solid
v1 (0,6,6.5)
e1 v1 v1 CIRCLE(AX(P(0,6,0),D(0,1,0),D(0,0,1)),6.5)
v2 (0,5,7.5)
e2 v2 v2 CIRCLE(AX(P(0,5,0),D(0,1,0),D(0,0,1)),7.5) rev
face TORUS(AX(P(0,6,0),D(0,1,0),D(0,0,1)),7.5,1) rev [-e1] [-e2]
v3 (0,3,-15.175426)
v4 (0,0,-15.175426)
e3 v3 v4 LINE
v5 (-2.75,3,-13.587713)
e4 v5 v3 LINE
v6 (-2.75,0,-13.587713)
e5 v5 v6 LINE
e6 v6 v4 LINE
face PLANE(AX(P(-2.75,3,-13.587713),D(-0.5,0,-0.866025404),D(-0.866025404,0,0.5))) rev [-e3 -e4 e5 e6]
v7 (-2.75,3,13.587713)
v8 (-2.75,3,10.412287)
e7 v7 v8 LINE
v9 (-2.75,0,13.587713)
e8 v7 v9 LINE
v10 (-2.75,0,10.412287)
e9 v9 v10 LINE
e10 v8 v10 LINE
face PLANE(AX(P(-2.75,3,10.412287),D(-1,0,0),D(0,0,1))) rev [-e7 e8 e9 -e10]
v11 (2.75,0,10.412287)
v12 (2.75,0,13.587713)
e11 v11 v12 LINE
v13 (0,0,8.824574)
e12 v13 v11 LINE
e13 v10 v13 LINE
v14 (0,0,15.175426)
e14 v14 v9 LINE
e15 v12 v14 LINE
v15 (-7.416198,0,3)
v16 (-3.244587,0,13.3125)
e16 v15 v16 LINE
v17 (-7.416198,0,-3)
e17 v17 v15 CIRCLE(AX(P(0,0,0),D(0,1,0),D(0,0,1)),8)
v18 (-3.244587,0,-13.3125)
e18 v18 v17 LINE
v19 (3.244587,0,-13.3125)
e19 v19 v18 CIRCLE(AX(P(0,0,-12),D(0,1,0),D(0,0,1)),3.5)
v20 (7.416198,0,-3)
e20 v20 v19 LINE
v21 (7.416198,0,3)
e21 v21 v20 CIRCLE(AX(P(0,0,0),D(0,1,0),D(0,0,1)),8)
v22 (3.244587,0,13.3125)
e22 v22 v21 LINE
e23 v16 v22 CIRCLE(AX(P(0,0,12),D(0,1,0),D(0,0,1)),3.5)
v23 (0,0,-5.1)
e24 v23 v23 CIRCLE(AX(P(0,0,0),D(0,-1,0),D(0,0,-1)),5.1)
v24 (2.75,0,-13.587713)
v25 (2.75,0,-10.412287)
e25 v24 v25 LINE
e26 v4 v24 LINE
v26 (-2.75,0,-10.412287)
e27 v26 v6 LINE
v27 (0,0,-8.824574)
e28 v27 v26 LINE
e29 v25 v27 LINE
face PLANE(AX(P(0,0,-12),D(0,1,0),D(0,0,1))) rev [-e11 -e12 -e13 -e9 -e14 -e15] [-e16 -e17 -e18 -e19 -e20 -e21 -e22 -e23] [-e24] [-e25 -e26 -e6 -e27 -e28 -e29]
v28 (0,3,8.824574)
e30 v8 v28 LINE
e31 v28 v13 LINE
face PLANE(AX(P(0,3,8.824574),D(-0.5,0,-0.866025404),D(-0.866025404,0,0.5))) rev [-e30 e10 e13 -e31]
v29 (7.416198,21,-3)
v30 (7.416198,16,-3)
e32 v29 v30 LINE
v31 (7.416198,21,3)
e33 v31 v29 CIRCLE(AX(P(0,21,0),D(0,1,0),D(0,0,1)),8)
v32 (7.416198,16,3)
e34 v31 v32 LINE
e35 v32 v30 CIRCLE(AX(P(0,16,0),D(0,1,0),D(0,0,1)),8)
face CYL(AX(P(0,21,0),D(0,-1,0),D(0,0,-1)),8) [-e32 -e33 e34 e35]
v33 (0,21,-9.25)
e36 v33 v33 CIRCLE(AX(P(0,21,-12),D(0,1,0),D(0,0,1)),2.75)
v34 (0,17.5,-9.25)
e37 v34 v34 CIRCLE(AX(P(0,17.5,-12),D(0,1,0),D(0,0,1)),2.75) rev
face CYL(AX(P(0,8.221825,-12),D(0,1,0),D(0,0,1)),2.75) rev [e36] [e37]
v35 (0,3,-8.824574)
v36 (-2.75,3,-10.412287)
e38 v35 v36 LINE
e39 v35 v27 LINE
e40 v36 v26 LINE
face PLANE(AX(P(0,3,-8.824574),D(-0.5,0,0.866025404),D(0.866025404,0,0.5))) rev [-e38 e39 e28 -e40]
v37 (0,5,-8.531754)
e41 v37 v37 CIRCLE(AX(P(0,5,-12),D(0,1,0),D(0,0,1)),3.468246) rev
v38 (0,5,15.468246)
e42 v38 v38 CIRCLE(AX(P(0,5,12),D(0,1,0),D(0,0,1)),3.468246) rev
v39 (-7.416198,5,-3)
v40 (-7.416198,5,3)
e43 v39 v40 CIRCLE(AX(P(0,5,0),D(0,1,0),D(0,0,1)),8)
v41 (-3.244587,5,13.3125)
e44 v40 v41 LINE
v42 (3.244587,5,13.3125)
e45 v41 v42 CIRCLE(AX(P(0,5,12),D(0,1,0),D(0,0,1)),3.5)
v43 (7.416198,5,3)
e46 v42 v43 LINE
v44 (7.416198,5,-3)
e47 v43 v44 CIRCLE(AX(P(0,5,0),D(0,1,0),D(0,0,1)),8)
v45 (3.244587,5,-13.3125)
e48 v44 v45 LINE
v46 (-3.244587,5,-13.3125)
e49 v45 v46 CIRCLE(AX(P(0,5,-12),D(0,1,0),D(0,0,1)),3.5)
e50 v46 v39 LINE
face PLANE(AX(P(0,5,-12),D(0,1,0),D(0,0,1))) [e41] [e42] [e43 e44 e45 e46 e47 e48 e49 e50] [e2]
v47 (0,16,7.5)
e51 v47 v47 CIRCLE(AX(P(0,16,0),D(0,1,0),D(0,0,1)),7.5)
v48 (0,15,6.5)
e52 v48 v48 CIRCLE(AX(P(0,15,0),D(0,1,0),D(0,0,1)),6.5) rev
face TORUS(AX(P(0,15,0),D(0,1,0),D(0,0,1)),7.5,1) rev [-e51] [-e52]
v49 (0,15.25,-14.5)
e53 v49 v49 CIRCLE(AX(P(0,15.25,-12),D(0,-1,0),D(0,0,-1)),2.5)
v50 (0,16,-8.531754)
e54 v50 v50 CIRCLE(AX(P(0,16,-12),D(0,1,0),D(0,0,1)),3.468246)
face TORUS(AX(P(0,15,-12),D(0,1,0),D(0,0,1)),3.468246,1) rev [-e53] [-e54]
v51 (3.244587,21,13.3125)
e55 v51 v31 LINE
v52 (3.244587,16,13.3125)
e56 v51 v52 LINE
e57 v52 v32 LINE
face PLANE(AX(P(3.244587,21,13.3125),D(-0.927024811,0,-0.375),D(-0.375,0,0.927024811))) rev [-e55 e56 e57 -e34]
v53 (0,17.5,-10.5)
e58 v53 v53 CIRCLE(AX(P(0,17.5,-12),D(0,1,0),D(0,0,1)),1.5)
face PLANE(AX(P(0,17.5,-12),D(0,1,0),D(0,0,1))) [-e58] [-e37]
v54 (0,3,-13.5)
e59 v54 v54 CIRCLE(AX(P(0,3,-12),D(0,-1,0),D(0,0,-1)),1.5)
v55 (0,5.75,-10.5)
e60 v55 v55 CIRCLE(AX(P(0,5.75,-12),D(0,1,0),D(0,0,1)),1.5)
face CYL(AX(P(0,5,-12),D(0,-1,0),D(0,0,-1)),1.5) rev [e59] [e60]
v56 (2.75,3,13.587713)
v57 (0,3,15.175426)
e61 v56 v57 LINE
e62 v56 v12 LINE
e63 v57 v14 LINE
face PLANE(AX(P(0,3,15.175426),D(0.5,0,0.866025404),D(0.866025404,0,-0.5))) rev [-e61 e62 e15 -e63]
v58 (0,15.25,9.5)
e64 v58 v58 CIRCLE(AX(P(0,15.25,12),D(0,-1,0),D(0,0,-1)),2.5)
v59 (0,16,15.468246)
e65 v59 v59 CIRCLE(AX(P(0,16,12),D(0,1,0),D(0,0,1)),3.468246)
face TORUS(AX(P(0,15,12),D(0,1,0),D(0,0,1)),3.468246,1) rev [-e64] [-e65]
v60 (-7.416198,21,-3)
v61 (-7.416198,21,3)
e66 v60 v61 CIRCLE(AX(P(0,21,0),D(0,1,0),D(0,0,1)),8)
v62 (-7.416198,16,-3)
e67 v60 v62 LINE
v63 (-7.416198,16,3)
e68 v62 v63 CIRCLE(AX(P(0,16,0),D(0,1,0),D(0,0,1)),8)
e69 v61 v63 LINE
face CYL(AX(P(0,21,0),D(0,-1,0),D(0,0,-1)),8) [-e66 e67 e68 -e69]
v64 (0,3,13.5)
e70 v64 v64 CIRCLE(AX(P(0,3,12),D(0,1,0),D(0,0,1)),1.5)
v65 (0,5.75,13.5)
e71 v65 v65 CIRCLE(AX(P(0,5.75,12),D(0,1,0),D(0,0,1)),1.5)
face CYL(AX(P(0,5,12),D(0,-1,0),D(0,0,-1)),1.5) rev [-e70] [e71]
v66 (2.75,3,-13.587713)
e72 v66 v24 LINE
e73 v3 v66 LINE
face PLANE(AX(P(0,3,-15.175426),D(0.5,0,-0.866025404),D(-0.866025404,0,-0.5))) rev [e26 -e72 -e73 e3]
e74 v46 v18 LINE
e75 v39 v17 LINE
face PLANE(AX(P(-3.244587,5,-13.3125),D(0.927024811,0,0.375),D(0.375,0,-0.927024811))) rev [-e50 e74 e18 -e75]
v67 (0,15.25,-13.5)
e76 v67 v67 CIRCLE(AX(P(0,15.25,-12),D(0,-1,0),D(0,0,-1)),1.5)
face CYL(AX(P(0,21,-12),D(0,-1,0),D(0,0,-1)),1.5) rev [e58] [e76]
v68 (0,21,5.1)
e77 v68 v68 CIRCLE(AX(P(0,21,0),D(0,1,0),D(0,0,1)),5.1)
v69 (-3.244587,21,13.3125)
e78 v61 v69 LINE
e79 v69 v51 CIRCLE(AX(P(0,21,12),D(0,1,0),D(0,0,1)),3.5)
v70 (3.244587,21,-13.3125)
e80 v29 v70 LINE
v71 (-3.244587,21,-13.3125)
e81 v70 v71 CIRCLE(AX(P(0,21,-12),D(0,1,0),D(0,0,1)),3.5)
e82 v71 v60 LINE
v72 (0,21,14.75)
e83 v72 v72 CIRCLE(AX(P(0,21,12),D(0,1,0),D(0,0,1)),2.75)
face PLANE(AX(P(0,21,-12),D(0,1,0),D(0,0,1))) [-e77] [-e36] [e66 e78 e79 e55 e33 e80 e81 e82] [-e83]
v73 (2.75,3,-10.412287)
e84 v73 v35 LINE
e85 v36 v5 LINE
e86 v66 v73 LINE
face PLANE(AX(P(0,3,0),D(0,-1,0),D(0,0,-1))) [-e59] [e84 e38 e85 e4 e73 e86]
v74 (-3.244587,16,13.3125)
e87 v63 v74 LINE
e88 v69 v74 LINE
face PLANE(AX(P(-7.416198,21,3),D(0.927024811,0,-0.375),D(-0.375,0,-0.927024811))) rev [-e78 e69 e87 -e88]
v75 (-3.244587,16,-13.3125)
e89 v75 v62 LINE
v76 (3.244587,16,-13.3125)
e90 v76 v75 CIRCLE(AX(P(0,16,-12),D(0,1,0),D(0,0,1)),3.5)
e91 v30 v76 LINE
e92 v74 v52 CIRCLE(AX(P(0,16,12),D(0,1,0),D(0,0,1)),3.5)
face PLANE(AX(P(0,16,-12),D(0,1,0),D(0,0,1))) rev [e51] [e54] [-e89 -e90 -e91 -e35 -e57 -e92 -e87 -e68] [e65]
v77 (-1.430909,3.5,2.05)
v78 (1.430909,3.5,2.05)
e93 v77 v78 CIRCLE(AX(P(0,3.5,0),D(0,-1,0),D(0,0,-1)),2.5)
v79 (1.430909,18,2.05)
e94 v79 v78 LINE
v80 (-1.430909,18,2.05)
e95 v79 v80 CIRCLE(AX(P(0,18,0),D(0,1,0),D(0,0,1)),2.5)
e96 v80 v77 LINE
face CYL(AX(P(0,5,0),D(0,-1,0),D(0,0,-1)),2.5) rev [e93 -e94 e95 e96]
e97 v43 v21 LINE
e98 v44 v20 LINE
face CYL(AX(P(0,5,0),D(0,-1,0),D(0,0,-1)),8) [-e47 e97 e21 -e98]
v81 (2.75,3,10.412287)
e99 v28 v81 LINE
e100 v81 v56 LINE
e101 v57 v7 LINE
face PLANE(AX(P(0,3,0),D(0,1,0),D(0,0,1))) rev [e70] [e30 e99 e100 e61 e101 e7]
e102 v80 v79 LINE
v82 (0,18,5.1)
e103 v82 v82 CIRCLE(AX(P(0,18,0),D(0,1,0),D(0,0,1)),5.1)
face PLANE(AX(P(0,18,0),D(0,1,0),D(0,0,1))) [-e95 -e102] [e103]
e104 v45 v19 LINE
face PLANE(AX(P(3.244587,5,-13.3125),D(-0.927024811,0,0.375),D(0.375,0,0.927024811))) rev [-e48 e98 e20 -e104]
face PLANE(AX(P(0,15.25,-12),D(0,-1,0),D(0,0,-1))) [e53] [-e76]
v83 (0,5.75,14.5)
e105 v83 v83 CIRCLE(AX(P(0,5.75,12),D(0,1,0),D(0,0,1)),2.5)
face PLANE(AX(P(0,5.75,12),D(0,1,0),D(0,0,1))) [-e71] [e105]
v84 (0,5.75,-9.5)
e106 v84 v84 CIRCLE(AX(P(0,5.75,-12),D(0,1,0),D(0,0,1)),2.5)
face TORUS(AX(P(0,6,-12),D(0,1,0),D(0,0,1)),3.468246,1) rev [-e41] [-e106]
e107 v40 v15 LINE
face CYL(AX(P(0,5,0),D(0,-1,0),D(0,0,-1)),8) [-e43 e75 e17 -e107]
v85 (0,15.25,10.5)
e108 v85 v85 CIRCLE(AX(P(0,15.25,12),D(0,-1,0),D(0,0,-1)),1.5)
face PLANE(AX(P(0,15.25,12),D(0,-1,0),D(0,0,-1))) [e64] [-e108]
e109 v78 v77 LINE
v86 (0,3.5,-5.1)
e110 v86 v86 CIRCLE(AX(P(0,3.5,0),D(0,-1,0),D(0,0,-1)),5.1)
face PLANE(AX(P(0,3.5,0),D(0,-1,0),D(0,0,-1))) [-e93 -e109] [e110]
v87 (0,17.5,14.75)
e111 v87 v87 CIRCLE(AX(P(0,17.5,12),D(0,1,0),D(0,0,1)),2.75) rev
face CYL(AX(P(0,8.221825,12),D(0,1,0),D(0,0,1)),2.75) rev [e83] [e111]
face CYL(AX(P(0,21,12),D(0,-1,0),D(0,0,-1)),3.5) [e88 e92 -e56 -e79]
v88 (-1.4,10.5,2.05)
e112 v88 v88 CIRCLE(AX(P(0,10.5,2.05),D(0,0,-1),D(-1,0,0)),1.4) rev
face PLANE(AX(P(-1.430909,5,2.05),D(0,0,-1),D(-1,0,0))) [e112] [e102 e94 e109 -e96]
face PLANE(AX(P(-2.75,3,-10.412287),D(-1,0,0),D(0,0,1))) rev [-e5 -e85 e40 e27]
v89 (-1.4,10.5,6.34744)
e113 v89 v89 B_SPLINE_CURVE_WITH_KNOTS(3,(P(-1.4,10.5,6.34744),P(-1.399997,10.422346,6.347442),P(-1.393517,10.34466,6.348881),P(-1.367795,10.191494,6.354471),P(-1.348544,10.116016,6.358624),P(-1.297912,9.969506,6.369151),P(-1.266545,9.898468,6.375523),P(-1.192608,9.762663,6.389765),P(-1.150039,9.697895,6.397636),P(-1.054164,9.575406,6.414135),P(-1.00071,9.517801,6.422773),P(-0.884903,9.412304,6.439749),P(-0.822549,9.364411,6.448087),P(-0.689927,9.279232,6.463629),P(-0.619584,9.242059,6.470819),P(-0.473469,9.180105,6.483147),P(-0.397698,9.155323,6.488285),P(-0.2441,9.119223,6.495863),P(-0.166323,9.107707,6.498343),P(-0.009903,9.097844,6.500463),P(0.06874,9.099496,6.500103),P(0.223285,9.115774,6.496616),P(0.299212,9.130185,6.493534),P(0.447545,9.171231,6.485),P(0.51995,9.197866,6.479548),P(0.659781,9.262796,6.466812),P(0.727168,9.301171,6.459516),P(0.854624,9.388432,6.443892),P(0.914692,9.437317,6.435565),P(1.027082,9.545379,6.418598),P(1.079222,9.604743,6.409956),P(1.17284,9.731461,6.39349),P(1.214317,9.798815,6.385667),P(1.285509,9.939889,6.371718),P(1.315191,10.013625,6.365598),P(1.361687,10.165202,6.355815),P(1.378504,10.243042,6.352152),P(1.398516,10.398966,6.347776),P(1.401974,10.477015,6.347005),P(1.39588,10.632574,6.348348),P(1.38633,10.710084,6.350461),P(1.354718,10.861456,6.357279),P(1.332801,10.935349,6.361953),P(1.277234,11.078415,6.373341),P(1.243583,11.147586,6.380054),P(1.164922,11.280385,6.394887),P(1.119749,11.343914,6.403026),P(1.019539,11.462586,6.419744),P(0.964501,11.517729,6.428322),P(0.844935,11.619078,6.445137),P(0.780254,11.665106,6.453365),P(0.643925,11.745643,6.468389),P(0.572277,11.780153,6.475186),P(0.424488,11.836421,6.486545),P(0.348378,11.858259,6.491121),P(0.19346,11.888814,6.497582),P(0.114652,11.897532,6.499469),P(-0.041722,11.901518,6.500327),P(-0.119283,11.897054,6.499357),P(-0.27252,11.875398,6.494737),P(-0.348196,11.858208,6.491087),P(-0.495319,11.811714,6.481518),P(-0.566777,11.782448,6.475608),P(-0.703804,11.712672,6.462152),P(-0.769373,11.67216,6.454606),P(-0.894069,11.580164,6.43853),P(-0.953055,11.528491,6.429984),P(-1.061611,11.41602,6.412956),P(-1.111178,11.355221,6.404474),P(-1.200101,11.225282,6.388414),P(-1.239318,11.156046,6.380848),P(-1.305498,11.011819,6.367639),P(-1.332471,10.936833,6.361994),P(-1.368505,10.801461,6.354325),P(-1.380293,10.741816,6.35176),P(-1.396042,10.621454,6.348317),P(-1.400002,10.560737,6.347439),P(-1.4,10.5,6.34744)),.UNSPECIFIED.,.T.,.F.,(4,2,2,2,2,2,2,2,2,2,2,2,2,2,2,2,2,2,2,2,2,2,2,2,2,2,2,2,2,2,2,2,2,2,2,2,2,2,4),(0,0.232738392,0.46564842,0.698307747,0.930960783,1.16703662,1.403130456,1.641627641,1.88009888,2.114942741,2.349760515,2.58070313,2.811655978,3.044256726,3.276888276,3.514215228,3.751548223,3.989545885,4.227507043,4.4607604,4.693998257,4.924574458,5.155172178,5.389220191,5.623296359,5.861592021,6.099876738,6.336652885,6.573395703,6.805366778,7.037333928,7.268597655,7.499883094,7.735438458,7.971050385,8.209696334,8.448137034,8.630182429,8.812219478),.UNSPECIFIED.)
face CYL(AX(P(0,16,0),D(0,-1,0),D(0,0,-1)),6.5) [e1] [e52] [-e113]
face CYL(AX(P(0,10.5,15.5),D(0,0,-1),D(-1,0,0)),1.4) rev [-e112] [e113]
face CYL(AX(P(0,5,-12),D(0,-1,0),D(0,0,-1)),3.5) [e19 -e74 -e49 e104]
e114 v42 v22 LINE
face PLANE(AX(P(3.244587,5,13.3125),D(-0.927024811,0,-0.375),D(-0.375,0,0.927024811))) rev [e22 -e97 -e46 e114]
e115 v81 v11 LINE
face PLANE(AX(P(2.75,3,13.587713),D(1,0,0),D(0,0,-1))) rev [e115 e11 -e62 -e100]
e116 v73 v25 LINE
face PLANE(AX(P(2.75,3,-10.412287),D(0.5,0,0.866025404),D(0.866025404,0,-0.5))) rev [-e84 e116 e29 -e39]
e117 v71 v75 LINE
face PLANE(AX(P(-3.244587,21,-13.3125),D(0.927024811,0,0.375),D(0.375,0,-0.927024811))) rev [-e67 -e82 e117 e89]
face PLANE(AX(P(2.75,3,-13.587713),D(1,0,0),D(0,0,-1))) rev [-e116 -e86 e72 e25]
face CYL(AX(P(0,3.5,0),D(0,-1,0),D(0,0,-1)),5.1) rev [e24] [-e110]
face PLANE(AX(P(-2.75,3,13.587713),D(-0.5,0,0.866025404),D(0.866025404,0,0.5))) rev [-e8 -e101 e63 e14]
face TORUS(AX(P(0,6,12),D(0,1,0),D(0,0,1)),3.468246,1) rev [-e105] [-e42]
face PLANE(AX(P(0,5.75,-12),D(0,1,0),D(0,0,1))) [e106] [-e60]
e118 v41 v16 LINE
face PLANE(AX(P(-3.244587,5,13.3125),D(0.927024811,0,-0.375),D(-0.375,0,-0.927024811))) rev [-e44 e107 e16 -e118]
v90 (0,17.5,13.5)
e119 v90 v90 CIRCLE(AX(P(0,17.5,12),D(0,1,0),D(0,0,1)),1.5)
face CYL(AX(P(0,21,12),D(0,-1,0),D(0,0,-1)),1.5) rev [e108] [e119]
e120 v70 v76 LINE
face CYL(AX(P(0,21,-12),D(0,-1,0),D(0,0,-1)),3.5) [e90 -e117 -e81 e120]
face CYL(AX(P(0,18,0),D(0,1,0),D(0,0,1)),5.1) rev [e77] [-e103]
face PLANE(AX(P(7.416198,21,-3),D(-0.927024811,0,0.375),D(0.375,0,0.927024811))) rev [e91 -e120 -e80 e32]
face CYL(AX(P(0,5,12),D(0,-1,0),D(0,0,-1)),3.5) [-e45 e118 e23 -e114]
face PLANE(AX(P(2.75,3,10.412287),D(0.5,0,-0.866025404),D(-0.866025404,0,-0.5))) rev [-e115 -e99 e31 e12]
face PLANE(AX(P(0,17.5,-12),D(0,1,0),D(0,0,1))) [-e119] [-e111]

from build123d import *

# Parameters (mm, degrees)
SKETCH1_R           = 1.5
BOSS_EXTRUDE1_DEPTH = 5
SKETCH2_R           = 6.5
BOSS_EXTRUDE2_DEPTH = 11
SKETCH3_R           = 1.5
BOSS_EXTRUDE3_DEPTH = 5
SKETCH4_R           = 1.4
CUT_EXTRUDE1_DEPTH  = 28.299267389
FILLET1_R           = 1
CUT_EXTRUDE2_DEPTH  = 3
SKETCH8_R           = 2.5
SKETCH8_R_2         = 1.5
BOSS_EXTRUDE5_DEPTH = 0.75
FILLET4_R           = 1
BOSS_EXTRUDE6_START = 0.75
SKETCH9_R           = 2.5
SKETCH9_R_2         = 1.5
BOSS_EXTRUDE6_DEPTH = 0.75
FILLET5_R           = 1
SKETCH12_R          = 2.75
CUT_EXTRUDE5_DEPTH  = 3.5
SKETCH10_R          = 5.1
CUT_EXTRUDE3_DEPTH  = 3
CUT_EXTRUDE4_START  = -3.5
SKETCH11_R          = 5.1
CUT_EXTRUDE4_DEPTH  = 3.5


with BuildPart() as part:
    # Sketch1 → Boss-Extrude1 (new body)
    with BuildSketch(Plane(origin=(0, 0, 0), x_dir=(1, 0, 0), z_dir=(0, 1, 0))):
        with BuildLine():
            Line((-3.244586838, 13.3125), (-7.416198487, 3))
            ThreePointArc((-7.416198487, 3), (-8, 0), (-7.416198487, -3))
            Line((-7.416198487, -3), (-3.244586838, -13.3125))
            ThreePointArc((-3.244586838, -13.3125), (0, -15.5), (3.244586838, -13.3125))
            Line((3.244586838, -13.3125), (7.416198487, -3))
            ThreePointArc((7.416198487, -3), (8, 0), (7.416198487, 3))
            Line((7.416198487, 3), (3.244586838, 13.3125))
            ThreePointArc((3.244586838, 13.3125), (0, 15.5), (-3.244586838, 13.3125))
        make_face()
        with Locations(Location((0, 12, 0), (0, 0, 270))):
            Circle(SKETCH1_R, mode=Mode.SUBTRACT)
        with Locations(Location((0, -12, 0), (0, 0, 270))):
            Circle(SKETCH1_R, mode=Mode.SUBTRACT)
        with BuildLine():
            Line((-1.430908802, -2.05), (1.430908802, -2.05))
            ThreePointArc((1.430908802, -2.05), (0, 2.5), (-1.430908802, -2.05))
        make_face(mode=Mode.SUBTRACT)
    extrude(amount=BOSS_EXTRUDE1_DEPTH)

    # Sketch2 → Boss-Extrude2 (add)
    with BuildSketch(Plane(origin=(0, 5, 0), x_dir=(1, 0, 0), z_dir=(0, 1, 0))):
        with Locations(Location((0, 0, 0), (0, 0, 270))):
            Circle(SKETCH2_R)
        with BuildLine():
            Line((-1.430908802, -2.05), (1.430908802, -2.05))
            ThreePointArc((1.430908802, -2.05), (0, 2.5), (-1.430908802, -2.05))
        make_face(mode=Mode.SUBTRACT)
    extrude(amount=BOSS_EXTRUDE2_DEPTH)

    # Sketch3 → Boss-Extrude3 (add)
    with BuildSketch(Plane(origin=(0, 16, 0), x_dir=(1, 0, 0), z_dir=(0, 1, 0))):
        with BuildLine():
            Line((-3.244586838, 13.3125), (-7.416198487, 3))
            ThreePointArc((-7.416198487, 3), (-8, 0), (-7.416198487, -3))
            Line((-7.416198487, -3), (-3.244586838, -13.3125))
            ThreePointArc((-3.244586838, -13.3125), (0, -15.5), (3.244586838, -13.3125))
            Line((3.244586838, -13.3125), (7.416198487, -3))
            ThreePointArc((7.416198487, -3), (8, 0), (7.416198487, 3))
            Line((7.416198487, 3), (3.244586838, 13.3125))
            ThreePointArc((3.244586838, 13.3125), (0, 15.5), (-3.244586838, 13.3125))
        make_face()
        with Locations(Location((0, -12, 0), (0, 0, 270))):
            Circle(SKETCH3_R, mode=Mode.SUBTRACT)
        with Locations(Location((0, 12, 0), (0, 0, 270))):
            Circle(SKETCH3_R, mode=Mode.SUBTRACT)
        with BuildLine():
            Line((-1.430908802, -2.05), (1.430908802, -2.05))
            ThreePointArc((1.430908802, -2.05), (0, 2.5), (-1.430908802, -2.05))
        make_face(mode=Mode.SUBTRACT)
    extrude(amount=BOSS_EXTRUDE3_DEPTH)

    # Sketch4 → Cut-Extrude1 (cut, through all)
    with BuildSketch(Plane.XY):
        with Locations(Location((0, 10.5, 0), (0, 0, 180))):
            Circle(SKETCH4_R)
    extrude(amount=CUT_EXTRUDE1_DEPTH, mode=Mode.SUBTRACT)

    # Fillet1
    fillet1_edges = [part.edges().sort_by_distance(p)[0] for p in [
        (0, 16, -6.5),
        (0, 5, -6.5),
    ]]
    fillet(fillet1_edges, radius=FILLET1_R)

    # Sketch6 → Cut-Extrude2 (cut)
    with BuildSketch(Plane.XZ):
        Polygon((2.75, -13.58771324), (2.75, -10.41228676), (0, -8.824573519), (-2.75, -10.41228676), (-2.75, -13.58771324), (0, -15.175426481), align=None)
        Polygon((0, 15.175426481), (2.75, 13.58771324), (2.75, 10.41228676), (0, 8.824573519), (-2.75, 10.41228676), (-2.75, 13.58771324), align=None)
    extrude(amount=-CUT_EXTRUDE2_DEPTH, mode=Mode.SUBTRACT)

    # Sketch8 → Boss-Extrude5 (add)
    # profile 1 of 2: a face of its own
    with BuildSketch(Plane(origin=(0, 5, 0), x_dir=(1, 0, 0), z_dir=(0, 1, 0))):
        with Locations(Location((0, -12, 0), (0, 0, 270))):
            Circle(SKETCH8_R)
        with Locations(Location((0, -12, 0), (0, 0, 270))):
            Circle(SKETCH8_R_2, mode=Mode.SUBTRACT)
    # profile 2 of 2: a face of its own
    with BuildSketch(Plane(origin=(0, 5, 0), x_dir=(1, 0, 0), z_dir=(0, 1, 0))):
        with Locations(Location((0, 12, 0), (0, 0, 270))):
            Circle(SKETCH8_R)
        with Locations(Location((0, 12, 0), (0, 0, 90))):
            Circle(SKETCH8_R_2, mode=Mode.SUBTRACT)
    extrude(amount=BOSS_EXTRUDE5_DEPTH)

    # Fillet4
    # the kernel refuses this fillet: 1 mm, written as the material it adds along each edge
    with BuildSketch(Plane(origin=(0, 5, 12), x_dir=(0, 0, 1), z_dir=(-1, 0, 0))) as fillet4_piece_1:
        with BuildLine():
            CenterArc((3.468245837, 1), FILLET4_R, 194.477512186, 75.522487814)
            Line((2.5, 0.75), (2.480635083, 0.745))
            ThreePointArc((2.480635083, 0.745), (2.48, 0.375), (2.48, 0))
            Line((2.48, 0), (2.5, -0.02))
            Line((2.5, -0.02), (3.468245837, -0.02))
            Line((3.468245837, -0.02), (3.468245837, 0))
        make_face()
    revolve(axis=Axis((0, 5, 12), (0, 1, 0)))
    with BuildSketch(Plane(origin=(0, 5, -12), x_dir=(0, 0, 1), z_dir=(-1, 0, 0))) as fillet4_piece_2:
        with BuildLine():
            CenterArc((3.468245837, 1), FILLET4_R, 194.477512186, 75.522487814)
            Line((2.5, 0.75), (2.480635083, 0.745))
            ThreePointArc((2.480635083, 0.745), (2.48, 0.375), (2.48, 0))
            Line((2.48, 0), (2.5, -0.02))
            Line((2.5, -0.02), (3.468245837, -0.02))
            Line((3.468245837, -0.02), (3.468245837, 0))
        make_face()
    revolve(axis=Axis((0, 5, -12), (0, 1, 0)))

    # Sketch9 → Boss-Extrude6 (add)
    # profile 1 of 2: a face of its own
    with BuildSketch(Plane.XZ.offset(-16).offset(BOSS_EXTRUDE6_START)):
        with Locations(Location((0, -12, 0), (0, 0, 90))):
            Circle(SKETCH9_R)
        with Locations(Location((0, -12, 0), (0, 0, 270))):
            Circle(SKETCH9_R_2, mode=Mode.SUBTRACT)
    # profile 2 of 2: a face of its own
    with BuildSketch(Plane.XZ.offset(-16).offset(BOSS_EXTRUDE6_START)):
        with Locations(Location((0, 12, 0), (0, 0, 90))):
            Circle(SKETCH9_R)
        with Locations(Location((0, 12, 0), (0, 0, 90))):
            Circle(SKETCH9_R_2, mode=Mode.SUBTRACT)
    extrude(amount=-BOSS_EXTRUDE6_DEPTH)

    # Fillet5
    # the kernel refuses this fillet: 1 mm, written as the material it adds along each edge
    with BuildSketch(Plane(origin=(0, 16, -12), x_dir=(0, 0, 1), z_dir=(1, 0, 0))) as fillet5_piece_1:
        with BuildLine():
            CenterArc((3.468245837, 1), FILLET5_R, 194.477512186, 75.522487814)
            Line((2.5, 0.75), (2.480635083, 0.745))
            ThreePointArc((2.480635083, 0.745), (2.48, 0.375), (2.48, 0))
            Line((2.48, 0), (2.5, -0.02))
            Line((2.5, -0.02), (3.468245837, -0.02))
            Line((3.468245837, -0.02), (3.468245837, 0))
        make_face()
    revolve(axis=Axis((0, 16, -12), (0, -1, 0)))
    with BuildSketch(Plane(origin=(0, 16, 12), x_dir=(0, 0, 1), z_dir=(1, 0, 0))) as fillet5_piece_2:
        with BuildLine():
            CenterArc((3.468245837, 1), FILLET5_R, 194.477512186, 75.522487814)
            Line((2.5, 0.75), (2.480635083, 0.745))
            ThreePointArc((2.480635083, 0.745), (2.48, 0.375), (2.48, 0))
            Line((2.48, 0), (2.5, -0.02))
            Line((2.5, -0.02), (3.468245837, -0.02))
            Line((3.468245837, -0.02), (3.468245837, 0))
        make_face()
    revolve(axis=Axis((0, 16, 12), (0, -1, 0)))

    # Sketch12 → Cut-Extrude5 (cut)
    with BuildSketch(Plane(origin=(0, 21, 0), x_dir=(1, 0, 0), z_dir=(0, 1, 0))):
        with Locations(Location((0, 12, 0), (0, 0, 270))):
            Circle(SKETCH12_R)
        with Locations(Location((0, -12, 0), (0, 0, 270))):
            Circle(SKETCH12_R)
    extrude(amount=-CUT_EXTRUDE5_DEPTH, mode=Mode.SUBTRACT)

    # Sketch10 → Cut-Extrude3 (cut)
    with BuildSketch(Plane(origin=(0, 21, 0), x_dir=(1, 0, 0), z_dir=(0, 1, 0))):
        with Locations(Location((0, 0, 0), (0, 0, 270))):
            Circle(SKETCH10_R)
    extrude(amount=-CUT_EXTRUDE3_DEPTH, mode=Mode.SUBTRACT)

    # Sketch11 → Cut-Extrude4 (cut)
    with BuildSketch(Plane.XZ.offset(CUT_EXTRUDE4_START)):
        with Locations(Location((0, 0, 0), (0, 0, 90))):
            Circle(SKETCH11_R)
    extrude(amount=CUT_EXTRUDE4_DEPTH, mode=Mode.SUBTRACT)


solid = part.part
